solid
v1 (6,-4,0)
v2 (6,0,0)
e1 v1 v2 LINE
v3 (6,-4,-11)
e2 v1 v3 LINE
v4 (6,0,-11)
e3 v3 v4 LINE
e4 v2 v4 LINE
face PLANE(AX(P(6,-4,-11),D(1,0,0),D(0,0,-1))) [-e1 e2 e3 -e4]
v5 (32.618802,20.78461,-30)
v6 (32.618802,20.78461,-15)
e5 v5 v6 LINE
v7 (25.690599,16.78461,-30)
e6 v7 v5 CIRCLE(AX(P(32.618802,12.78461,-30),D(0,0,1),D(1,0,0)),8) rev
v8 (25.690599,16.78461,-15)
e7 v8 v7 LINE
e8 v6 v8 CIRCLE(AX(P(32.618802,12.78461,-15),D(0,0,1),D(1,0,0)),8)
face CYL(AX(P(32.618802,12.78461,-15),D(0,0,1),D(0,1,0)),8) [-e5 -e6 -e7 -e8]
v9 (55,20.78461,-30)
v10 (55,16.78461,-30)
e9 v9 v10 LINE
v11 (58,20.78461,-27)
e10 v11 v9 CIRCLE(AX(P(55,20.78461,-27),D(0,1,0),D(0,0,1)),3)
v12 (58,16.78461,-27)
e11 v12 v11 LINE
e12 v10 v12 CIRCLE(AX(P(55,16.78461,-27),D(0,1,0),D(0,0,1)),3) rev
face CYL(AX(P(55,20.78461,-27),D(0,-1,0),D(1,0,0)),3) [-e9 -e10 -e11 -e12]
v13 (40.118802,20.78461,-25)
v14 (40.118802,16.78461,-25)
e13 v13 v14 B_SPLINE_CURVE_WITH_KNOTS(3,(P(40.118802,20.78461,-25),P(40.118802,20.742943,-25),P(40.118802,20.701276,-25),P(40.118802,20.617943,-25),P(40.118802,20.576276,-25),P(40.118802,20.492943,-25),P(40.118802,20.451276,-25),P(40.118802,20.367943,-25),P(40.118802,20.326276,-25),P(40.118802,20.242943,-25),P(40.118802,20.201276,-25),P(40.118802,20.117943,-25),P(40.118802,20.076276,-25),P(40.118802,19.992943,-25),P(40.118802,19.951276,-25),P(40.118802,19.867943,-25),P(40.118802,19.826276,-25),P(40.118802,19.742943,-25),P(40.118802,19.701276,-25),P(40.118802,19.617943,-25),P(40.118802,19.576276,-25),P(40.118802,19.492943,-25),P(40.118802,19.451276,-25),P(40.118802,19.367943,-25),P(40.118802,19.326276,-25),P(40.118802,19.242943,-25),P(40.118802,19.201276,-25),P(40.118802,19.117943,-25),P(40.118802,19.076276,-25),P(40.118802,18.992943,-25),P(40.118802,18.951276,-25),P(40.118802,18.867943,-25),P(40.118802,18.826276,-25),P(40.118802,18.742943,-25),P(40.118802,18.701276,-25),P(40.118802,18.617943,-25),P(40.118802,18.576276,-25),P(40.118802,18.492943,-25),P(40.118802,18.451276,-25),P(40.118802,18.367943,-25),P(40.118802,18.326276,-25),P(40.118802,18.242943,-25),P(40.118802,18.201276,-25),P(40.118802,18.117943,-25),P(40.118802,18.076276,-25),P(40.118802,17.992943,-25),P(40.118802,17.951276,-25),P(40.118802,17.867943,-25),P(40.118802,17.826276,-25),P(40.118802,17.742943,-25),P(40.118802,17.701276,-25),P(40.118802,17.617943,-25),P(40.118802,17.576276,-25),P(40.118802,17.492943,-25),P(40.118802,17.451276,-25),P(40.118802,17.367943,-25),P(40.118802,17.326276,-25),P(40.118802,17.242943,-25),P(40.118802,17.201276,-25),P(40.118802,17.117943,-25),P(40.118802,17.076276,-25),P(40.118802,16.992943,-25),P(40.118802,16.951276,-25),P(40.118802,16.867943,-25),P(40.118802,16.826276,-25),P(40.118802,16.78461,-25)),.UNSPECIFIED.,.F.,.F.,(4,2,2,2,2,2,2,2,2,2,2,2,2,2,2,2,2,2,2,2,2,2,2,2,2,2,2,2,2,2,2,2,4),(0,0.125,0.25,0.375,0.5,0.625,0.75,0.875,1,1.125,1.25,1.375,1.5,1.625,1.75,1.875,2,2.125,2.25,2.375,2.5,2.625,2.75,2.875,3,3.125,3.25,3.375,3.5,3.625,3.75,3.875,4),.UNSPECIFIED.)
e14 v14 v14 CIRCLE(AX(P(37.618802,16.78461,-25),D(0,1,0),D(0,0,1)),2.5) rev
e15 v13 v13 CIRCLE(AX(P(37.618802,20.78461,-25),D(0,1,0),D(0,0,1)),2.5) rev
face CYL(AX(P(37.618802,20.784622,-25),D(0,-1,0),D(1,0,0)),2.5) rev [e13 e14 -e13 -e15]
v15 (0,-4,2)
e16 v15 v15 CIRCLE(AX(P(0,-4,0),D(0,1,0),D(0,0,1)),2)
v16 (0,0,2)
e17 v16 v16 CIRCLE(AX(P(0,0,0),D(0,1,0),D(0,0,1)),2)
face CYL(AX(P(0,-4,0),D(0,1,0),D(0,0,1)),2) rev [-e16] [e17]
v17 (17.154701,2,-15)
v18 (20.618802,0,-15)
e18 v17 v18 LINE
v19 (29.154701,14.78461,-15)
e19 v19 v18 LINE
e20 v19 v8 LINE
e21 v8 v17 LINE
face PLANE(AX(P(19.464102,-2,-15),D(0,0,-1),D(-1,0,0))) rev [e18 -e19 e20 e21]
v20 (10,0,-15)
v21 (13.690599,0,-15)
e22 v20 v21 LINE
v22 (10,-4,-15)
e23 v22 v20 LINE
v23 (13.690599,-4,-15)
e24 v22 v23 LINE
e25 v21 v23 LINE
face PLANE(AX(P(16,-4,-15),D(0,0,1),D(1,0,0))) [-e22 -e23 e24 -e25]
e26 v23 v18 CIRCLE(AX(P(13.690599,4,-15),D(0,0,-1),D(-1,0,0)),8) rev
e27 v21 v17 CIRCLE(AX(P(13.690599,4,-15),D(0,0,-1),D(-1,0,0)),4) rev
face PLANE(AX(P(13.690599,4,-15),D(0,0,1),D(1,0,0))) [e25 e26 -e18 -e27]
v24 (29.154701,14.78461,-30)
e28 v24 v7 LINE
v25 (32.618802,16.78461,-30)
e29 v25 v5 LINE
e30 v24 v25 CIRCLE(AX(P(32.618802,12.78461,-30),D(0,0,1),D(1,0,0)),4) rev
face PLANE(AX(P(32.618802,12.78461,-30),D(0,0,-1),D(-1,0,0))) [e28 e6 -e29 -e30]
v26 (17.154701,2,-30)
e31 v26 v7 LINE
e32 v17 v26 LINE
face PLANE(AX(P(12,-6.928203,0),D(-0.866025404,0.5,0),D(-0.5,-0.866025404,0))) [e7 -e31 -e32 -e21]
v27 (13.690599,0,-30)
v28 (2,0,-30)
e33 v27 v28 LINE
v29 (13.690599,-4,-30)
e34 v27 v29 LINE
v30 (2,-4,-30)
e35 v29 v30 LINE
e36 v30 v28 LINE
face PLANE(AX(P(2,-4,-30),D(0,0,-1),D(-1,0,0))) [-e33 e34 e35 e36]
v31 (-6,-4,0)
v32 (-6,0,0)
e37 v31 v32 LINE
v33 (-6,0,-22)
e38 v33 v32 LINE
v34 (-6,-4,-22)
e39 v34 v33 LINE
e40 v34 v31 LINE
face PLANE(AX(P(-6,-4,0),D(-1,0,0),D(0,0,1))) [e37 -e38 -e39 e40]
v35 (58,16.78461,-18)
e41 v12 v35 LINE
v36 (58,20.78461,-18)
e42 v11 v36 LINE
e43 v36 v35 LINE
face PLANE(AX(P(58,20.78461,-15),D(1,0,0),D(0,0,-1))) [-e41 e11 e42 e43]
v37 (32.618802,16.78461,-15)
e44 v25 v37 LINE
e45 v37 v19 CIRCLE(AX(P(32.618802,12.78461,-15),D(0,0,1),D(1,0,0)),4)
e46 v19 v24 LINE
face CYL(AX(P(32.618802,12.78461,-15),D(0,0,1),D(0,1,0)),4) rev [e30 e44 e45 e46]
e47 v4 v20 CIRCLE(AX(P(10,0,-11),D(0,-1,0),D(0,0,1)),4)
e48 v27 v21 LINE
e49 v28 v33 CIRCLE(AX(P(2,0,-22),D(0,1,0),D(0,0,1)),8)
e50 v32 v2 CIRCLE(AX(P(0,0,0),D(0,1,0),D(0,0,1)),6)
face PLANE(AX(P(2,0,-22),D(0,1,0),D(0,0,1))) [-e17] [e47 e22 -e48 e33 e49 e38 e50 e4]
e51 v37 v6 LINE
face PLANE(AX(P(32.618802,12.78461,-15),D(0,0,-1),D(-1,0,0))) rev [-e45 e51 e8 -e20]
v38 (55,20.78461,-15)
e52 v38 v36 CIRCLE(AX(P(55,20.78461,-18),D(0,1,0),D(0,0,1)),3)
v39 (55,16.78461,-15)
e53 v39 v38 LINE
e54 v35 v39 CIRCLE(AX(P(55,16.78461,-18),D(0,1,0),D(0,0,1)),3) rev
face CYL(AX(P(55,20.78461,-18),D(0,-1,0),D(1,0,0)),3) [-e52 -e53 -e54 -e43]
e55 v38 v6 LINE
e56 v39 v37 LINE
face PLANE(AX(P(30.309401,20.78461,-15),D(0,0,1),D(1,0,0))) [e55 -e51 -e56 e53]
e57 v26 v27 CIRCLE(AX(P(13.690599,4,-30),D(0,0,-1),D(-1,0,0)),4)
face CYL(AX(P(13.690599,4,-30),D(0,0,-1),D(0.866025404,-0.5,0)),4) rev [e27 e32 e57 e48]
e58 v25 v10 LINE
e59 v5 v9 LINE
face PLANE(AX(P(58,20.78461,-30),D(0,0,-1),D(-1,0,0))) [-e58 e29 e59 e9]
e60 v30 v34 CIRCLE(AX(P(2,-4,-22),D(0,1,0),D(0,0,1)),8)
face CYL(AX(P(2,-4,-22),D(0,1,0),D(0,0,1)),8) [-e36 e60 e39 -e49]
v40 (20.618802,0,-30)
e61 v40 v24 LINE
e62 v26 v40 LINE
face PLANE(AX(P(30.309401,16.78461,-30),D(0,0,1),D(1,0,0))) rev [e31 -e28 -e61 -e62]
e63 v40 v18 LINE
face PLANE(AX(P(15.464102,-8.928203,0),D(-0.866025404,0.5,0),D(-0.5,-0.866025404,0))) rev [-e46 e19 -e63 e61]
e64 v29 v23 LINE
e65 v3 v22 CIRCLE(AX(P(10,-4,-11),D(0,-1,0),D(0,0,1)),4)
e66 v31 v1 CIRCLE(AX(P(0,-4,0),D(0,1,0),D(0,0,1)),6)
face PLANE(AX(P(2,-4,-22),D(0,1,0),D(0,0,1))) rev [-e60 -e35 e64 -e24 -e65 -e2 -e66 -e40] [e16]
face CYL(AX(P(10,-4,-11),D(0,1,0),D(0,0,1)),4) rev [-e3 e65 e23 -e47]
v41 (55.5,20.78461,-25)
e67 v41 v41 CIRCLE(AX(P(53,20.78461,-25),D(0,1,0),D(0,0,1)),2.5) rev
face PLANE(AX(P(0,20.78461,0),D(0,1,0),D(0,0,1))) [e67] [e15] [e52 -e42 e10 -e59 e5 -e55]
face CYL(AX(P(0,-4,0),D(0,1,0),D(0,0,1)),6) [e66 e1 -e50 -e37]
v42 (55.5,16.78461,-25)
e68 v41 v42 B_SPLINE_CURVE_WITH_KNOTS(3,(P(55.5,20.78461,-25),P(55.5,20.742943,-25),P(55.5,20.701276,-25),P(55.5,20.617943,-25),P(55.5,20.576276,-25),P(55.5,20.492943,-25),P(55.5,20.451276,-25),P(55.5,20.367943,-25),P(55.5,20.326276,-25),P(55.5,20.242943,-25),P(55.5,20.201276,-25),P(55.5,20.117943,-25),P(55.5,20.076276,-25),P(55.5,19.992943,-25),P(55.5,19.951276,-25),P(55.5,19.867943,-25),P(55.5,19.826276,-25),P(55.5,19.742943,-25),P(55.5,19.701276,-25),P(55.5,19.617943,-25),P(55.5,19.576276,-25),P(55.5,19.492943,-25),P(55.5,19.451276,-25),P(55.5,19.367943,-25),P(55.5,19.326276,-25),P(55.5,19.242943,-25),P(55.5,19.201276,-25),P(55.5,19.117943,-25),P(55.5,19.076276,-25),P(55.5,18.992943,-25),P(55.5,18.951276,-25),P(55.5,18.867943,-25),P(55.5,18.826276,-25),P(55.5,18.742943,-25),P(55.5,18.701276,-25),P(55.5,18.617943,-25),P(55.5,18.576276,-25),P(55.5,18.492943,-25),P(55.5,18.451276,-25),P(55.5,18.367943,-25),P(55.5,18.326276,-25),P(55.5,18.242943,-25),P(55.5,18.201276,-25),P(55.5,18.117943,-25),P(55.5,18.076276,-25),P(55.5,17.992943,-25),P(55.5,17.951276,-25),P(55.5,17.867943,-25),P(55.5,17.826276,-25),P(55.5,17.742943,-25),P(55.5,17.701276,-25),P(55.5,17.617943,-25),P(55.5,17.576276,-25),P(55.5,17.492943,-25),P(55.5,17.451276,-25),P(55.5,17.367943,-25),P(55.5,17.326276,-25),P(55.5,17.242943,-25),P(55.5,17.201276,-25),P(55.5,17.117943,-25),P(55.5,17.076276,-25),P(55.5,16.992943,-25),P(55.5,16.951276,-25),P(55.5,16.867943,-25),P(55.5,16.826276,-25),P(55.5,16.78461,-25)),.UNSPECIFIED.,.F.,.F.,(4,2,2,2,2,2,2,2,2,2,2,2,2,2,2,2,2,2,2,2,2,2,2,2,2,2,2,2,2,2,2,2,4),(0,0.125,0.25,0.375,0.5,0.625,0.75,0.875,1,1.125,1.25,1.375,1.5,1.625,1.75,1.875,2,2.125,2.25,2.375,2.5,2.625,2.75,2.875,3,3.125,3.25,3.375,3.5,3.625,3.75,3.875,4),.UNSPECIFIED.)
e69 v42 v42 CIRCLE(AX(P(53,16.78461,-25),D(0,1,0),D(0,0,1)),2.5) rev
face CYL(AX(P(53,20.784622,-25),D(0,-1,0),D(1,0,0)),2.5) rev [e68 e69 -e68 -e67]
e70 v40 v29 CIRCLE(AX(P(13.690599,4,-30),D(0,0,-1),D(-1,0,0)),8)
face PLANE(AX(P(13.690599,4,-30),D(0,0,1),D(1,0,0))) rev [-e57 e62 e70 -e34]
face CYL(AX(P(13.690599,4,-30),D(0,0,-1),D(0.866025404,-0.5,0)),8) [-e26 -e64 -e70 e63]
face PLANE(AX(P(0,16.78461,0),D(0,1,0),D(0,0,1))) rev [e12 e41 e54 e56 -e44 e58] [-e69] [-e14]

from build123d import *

# Parameters (mm, degrees)
SKETCH_1_R                       = 2
SM_BASE_FLANGE_1_DEPTH           = 4
SM_EDGE_FLANGE_1_STRIP_CUT_DEPTH = 15
SM_EDGE_FLANGE_1_DEPTH           = 15
SM_EDGE_FLANGE_2_STRIP_CUT_DEPTH = 15
SM_EDGE_FLANGE_2_DEPTH           = 15
FILLET_1_R                       = 3
FILLET_2_R                       = 3
CUT_EXTRUDE_1_REACH              = 71.845
SKETCH_14_R                      = 2.5
CUT_EXTRUDE_1_DIRECTION_2_DEPTH  = 70.844662484


# Sheet-metal steps are written as plain solids
with BuildPart() as part:
    # Sketch 1 → Базовая кромка1 (new body)
    with BuildSketch(Plane(origin=(0, 0, 0), x_dir=(1, 0, 0), z_dir=(0, 1, 0))):
        with BuildLine():
            Line((-6, 0), (-6, 22))
            ThreePointArc((-6, 22), (-3.656854249, 27.656854249), (2, 30))
            Line((2, 30), (16, 30))
            Line((16, 30), (16, 15))
            Line((16, 15), (10, 15))
            ThreePointArc((10, 15), (7.171572875, 13.828427125), (6, 11))
            Line((6, 11), (6, 0))
            ThreePointArc((6, 0), (0, -6), (-6, 0))
        make_face()
        with Locations(Location((0, 0, 0), (0, 0, 270))):
            Circle(SKETCH_1_R, mode=Mode.SUBTRACT)
    extrude(amount=-SM_BASE_FLANGE_1_DEPTH)

    # Ребро-кромка1 strip (across the edge) → Ребро-кромка1 strip cut (cut)
    with BuildSketch(Plane(origin=(16, 0, -15), x_dir=(-0.8660254037844366, 0.5000000000000038, 0), z_dir=(0, 0, -1))):
        Polygon((-20.784609691, 7.381197846), (0, -4.618802154), (2, -1.154700538), (-18.784609691, 10.845299462), align=None)
    extrude(amount=SM_EDGE_FLANGE_1_STRIP_CUT_DEPTH, mode=Mode.SUBTRACT)

    # Ребро-кромка1 section (across the edge) → Ребро-кромка1 (add)
    with BuildSketch(Plane(origin=(16, 0, -15), x_dir=(-0.8660254037844366, 0.5000000000000038, 0), z_dir=(0, 0, -1))):
        with BuildLine():
            Line((-4, 2.309401077), (-4, 21.690598923))
            Line((-4, 21.690598923), (0, 21.690598923))
            Line((0, 21.690598923), (0, 2.309401077))
            ThreePointArc((0, 2.309401077), (0.535898385, 0.309401077), (2, -1.154700538))
            Line((2, -1.154700538), (0, -4.618802154))
            ThreePointArc((0, -4.618802154), (-2.92820323, -1.690598923), (-4, 2.309401077))
        make_face()
    extrude(amount=SM_EDGE_FLANGE_1_DEPTH)

    # Ребро-кромка2 strip (across the edge) → Ребро-кромка2 strip cut (cut)
    with BuildSketch(Plane(origin=(30.309401077, 16.784609691, -30), x_dir=(0, -1, 0), z_dir=(0, 0, 1))):
        Polygon((-20.784609691, 7.381197846), (0, -4.618802154), (2, -1.154700538), (-18.784609691, 10.845299462), align=None)
    extrude(amount=SM_EDGE_FLANGE_2_STRIP_CUT_DEPTH, mode=Mode.SUBTRACT)

    # Ребро-кромка2 section (across the edge) → Ребро-кромка2 (add)
    with BuildSketch(Plane(origin=(30.309401077, 16.784609691, -30), x_dir=(0, -1, 0), z_dir=(0, 0, 1))):
        with BuildLine():
            Line((-4, 2.309401077), (-4, 27.690598923))
            Line((-4, 27.690598923), (0, 27.690598923))
            Line((0, 27.690598923), (0, 2.309401077))
            ThreePointArc((0, 2.309401077), (0.535898385, 0.309401077), (2, -1.154700538))
            Line((2, -1.154700538), (0, -4.618802154))
            ThreePointArc((0, -4.618802154), (-2.92820323, -1.690598923), (-4, 2.309401077))
        make_face()
    extrude(amount=SM_EDGE_FLANGE_2_DEPTH)

    # Скругление1
    fillet_1_edges = [part.edges().sort_by_distance(p)[0] for p in [
        (58, 18.784609691, -15),
    ]]
    fillet(fillet_1_edges, radius=FILLET_1_R)

    # Скругление2
    fillet_2_edges = [part.edges().sort_by_distance(p)[0] for p in [
        (58, 18.784609691, -30),
    ]]
    fillet(fillet_2_edges, radius=FILLET_2_R)

    # Эскиз14 → Вырез-Вытянуть1 (cut, up to next)
    with BuildSketch(Plane(origin=(0, 20.784609691, 0), x_dir=(1, 0, 0), z_dir=(0, 1, 0)), mode=Mode.PRIVATE) as cut_extrude_1_sk1:
        with Locations((53, 25)):
            Circle(SKETCH_14_R)
    cut_extrude_1_tool1 = extrude(cut_extrude_1_sk1.sketch, amount=-CUT_EXTRUDE_1_REACH, mode=Mode.PRIVATE) & part.part
    # Эскиз14 → Вырез-Вытянуть1 (cut, up to next)
    with BuildSketch(Plane(origin=(0, 20.784609691, 0), x_dir=(1, 0, 0), z_dir=(0, 1, 0)), mode=Mode.PRIVATE) as cut_extrude_1_sk2:
        with Locations((37.618802154, 25)):
            Circle(SKETCH_14_R)
    cut_extrude_1_tool2 = extrude(cut_extrude_1_sk2.sketch, amount=-CUT_EXTRUDE_1_REACH, mode=Mode.PRIVATE) & part.part
    add(cut_extrude_1_tool1.solids().sort_by_distance((53, 20.78461, -25))[0], mode=Mode.SUBTRACT)
    add(cut_extrude_1_tool2.solids().sort_by_distance((37.618802, 20.78461, -25))[0], mode=Mode.SUBTRACT)

    # Эскиз14 → Вырез-Вытянуть1 direction 2 (cut)
    with BuildSketch(Plane(origin=(0, 20.784609691, 0), x_dir=(1, 0, 0), z_dir=(0, 1, 0))):
        with Locations((53, 25)):
            Circle(SKETCH_14_R)
        with Locations((37.618802154, 25)):
            Circle(SKETCH_14_R)
    extrude(amount=CUT_EXTRUDE_1_DIRECTION_2_DEPTH, mode=Mode.SUBTRACT)


solid = part.part
